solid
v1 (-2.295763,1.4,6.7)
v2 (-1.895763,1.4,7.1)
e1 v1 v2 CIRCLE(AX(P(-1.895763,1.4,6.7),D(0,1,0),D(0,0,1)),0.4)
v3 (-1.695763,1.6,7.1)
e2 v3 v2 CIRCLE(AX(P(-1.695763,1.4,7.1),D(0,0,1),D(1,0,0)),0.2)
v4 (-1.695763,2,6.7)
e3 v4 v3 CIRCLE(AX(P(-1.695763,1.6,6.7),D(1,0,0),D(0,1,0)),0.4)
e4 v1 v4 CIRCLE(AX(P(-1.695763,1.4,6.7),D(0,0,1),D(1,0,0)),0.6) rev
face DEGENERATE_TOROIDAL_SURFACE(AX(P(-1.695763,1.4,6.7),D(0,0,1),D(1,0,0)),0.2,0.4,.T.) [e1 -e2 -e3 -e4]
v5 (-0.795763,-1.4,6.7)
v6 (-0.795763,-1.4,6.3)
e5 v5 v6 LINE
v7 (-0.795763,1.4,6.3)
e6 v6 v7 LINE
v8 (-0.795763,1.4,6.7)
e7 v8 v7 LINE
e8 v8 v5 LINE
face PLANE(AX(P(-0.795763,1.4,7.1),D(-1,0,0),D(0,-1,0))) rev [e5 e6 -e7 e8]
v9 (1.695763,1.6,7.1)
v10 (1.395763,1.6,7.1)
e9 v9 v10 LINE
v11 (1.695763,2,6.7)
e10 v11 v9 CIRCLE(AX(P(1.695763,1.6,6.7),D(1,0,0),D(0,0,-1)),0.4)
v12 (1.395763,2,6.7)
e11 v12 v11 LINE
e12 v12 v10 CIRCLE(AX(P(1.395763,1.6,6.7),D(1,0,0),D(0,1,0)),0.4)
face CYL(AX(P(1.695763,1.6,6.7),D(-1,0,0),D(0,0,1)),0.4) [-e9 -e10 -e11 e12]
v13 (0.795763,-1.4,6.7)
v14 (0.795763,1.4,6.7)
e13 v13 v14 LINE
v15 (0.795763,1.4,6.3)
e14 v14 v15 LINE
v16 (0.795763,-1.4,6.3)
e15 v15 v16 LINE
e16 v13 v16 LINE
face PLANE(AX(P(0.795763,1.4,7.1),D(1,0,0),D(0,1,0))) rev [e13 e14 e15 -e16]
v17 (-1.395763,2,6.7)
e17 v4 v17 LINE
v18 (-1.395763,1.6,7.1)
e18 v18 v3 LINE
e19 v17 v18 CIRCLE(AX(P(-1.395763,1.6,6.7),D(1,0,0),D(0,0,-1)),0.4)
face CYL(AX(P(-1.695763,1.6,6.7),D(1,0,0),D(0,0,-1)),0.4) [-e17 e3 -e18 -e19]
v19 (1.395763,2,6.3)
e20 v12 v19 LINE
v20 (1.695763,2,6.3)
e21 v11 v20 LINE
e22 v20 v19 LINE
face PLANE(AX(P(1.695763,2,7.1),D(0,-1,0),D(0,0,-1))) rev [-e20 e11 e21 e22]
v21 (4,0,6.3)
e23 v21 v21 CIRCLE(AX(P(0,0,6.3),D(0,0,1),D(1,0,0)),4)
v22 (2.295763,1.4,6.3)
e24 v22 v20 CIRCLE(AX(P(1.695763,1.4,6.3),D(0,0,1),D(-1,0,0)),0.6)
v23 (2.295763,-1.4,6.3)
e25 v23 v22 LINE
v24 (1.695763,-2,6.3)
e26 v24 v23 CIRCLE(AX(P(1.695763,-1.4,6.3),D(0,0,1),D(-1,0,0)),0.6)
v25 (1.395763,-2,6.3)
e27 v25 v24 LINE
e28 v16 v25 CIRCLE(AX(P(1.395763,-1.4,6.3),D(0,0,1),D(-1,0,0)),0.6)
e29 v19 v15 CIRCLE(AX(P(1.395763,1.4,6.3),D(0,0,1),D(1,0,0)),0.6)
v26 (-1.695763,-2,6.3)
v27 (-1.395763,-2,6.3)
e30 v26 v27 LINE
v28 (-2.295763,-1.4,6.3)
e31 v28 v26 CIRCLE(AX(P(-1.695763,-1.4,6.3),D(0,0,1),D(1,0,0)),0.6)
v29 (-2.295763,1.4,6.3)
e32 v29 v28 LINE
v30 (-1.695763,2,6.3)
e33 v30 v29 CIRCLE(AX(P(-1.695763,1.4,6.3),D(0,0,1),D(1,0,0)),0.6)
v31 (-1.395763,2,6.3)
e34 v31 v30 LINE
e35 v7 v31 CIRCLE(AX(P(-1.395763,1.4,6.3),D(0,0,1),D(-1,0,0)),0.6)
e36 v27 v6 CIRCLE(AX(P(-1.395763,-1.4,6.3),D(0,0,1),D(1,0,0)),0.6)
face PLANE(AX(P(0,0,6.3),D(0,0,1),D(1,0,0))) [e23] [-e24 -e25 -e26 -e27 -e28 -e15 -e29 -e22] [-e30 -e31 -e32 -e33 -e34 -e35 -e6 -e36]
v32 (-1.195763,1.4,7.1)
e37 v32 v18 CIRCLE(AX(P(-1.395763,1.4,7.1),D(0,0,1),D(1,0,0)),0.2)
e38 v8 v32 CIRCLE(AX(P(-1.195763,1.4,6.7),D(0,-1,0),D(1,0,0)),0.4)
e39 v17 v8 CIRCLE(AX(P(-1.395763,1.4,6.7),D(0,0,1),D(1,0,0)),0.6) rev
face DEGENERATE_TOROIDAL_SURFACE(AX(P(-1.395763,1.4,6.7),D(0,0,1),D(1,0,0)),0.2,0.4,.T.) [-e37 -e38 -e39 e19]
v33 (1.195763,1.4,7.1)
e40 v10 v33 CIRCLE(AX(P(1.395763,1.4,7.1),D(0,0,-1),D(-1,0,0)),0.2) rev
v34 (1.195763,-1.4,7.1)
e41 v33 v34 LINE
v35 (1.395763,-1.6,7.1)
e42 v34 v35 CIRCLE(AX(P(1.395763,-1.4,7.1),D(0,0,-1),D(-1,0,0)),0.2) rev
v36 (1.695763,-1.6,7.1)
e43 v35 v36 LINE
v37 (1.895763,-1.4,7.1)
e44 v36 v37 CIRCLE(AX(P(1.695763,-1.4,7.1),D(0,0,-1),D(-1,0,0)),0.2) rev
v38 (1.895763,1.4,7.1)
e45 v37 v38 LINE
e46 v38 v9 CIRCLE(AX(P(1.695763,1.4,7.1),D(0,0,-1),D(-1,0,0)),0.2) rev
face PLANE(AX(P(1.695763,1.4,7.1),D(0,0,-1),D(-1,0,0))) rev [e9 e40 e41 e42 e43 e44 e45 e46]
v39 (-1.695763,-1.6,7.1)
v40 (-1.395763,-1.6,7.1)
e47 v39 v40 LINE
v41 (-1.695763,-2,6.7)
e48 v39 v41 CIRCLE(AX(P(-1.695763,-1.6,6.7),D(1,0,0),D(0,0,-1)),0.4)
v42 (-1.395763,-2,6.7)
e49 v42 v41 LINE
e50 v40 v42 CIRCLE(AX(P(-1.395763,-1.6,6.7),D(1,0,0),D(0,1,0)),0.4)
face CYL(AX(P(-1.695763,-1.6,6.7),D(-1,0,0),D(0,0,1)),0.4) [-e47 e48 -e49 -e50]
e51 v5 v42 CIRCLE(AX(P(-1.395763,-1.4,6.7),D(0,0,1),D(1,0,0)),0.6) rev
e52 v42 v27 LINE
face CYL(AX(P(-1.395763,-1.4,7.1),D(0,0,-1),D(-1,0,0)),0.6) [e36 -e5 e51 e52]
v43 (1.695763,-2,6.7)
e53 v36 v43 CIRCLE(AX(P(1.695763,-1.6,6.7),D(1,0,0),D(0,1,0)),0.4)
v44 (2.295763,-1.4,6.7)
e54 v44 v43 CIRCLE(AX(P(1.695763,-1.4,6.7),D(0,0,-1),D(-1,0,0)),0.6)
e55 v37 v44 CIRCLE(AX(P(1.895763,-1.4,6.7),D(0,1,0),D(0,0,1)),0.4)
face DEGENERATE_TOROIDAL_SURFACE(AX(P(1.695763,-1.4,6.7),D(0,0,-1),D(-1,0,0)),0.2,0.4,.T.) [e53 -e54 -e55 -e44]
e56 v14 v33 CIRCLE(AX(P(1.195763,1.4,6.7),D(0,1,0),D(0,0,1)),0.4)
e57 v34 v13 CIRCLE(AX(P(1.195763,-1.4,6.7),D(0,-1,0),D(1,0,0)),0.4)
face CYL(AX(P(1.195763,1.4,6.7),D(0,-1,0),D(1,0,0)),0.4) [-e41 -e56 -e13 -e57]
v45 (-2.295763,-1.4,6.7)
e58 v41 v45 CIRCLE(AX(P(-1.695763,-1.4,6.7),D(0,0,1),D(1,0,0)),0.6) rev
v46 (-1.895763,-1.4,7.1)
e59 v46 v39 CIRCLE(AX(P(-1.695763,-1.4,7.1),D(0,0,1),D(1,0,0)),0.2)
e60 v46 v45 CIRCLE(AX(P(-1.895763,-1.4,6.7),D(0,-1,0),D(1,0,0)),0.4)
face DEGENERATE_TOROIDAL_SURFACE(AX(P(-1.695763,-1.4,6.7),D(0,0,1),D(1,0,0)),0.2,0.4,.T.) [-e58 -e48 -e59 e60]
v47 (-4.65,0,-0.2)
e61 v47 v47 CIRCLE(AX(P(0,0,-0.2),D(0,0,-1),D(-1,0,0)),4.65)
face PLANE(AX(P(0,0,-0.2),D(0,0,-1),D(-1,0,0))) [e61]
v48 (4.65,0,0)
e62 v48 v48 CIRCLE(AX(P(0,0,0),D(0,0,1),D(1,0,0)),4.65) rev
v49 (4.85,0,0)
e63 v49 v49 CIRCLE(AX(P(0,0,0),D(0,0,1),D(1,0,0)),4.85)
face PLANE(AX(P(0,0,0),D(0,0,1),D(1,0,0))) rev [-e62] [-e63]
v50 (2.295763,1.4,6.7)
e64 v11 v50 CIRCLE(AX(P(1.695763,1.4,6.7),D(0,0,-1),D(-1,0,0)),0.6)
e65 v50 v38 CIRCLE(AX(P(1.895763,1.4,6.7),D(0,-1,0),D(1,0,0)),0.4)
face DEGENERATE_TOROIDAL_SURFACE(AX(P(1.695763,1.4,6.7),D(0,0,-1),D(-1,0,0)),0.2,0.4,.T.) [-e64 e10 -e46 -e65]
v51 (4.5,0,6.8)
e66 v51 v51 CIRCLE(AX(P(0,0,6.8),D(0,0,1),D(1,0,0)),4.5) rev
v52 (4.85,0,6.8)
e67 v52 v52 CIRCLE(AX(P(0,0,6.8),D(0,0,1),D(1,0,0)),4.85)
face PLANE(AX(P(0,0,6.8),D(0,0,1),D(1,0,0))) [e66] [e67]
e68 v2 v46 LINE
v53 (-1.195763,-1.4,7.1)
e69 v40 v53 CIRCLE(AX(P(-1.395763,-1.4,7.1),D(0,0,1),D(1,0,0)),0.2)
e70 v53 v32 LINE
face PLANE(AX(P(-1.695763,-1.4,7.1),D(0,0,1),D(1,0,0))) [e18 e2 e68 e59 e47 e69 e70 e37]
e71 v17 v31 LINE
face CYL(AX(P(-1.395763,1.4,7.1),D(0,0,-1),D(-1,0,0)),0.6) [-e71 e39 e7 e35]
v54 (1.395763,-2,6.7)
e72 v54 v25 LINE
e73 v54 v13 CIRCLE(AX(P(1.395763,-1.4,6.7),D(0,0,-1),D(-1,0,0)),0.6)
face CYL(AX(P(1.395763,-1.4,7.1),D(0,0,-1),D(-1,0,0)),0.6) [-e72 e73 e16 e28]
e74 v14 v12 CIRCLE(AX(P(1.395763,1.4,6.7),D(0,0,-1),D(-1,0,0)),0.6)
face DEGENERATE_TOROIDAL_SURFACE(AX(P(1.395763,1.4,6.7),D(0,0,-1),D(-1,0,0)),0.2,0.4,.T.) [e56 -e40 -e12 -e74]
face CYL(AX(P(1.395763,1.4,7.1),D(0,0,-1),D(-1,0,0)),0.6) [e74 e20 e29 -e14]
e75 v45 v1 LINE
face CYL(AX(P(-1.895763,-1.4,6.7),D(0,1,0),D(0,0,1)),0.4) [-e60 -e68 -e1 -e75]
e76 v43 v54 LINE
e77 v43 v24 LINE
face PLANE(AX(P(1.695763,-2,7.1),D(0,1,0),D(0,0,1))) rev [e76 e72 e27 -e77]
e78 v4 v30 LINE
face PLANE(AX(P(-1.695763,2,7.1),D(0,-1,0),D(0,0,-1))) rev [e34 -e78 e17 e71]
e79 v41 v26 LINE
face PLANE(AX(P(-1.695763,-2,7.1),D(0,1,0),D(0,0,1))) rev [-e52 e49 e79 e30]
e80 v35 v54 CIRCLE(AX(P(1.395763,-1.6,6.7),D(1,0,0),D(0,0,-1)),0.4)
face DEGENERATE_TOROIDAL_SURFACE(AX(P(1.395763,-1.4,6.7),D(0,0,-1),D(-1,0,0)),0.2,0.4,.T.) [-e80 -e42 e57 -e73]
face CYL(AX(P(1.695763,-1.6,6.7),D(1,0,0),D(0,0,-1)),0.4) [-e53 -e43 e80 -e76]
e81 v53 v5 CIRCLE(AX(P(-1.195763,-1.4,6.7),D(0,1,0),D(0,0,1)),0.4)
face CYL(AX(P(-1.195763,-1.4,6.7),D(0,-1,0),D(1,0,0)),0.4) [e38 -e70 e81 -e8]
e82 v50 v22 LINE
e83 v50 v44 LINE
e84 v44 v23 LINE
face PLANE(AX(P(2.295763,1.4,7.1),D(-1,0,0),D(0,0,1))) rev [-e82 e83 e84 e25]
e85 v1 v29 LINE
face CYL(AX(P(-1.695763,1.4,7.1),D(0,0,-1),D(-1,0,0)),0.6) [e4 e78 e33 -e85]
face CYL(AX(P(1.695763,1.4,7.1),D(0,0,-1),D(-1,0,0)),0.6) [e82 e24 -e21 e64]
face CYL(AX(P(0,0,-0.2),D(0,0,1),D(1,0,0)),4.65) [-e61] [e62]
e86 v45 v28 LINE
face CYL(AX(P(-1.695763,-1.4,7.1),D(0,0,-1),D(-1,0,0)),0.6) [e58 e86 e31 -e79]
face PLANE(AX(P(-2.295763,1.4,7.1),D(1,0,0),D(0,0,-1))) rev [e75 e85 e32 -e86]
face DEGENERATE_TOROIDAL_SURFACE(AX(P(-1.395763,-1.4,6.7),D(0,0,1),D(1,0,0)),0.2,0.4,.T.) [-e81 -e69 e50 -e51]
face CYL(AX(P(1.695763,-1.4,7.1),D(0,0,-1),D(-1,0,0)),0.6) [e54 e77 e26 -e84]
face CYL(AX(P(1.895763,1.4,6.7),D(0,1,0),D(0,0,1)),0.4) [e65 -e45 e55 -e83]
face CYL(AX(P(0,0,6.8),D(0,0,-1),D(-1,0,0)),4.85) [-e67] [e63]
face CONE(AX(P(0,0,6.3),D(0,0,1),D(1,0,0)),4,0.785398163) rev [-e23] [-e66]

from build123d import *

# Parameters (mm, degrees)
SKETCH_1_R          = 4.85
EXTRUDE_1_DEPTH     = 6.8
SKETCH_2_R          = 4
CUT_EXTRUDE_1_DEPTH = 0.5
CHAMFER_1_SIZE      = 0.5
EXTRUDE_2_DEPTH     = 0.8
FILLET_1_R          = 0.4
SKETCH_4_R          = 4.65
EXTRUDE_3_DEPTH     = 0.2


with BuildPart() as part:
    # Эскиз1 → Бобышка-Вытянуть1 (new body)
    with BuildSketch(Plane.XY):
        Circle(SKETCH_1_R)
    extrude(amount=EXTRUDE_1_DEPTH)

    # Эскиз2 → Вырез-Вытянуть1 (cut)
    with BuildSketch(Plane.XY.offset(6.8)):
        Circle(SKETCH_2_R)
    extrude(amount=-CUT_EXTRUDE_1_DEPTH, mode=Mode.SUBTRACT)

    # Фаска1
    chamfer_1_edges = [part.edges().sort_by_distance(p)[0] for p in [
        (-4, 0, 6.8),
    ]]
    chamfer(chamfer_1_edges, length=CHAMFER_1_SIZE - 0.0001)  # a hair under: the kernel refuses the full size

    # Эскиз3 → Бобышка-Вытянуть2 (add)
    with BuildSketch(Plane.XY.offset(6.3)):
        with BuildLine():
            Line((-1.695763296, 2), (-1.395763296, 2))
            ThreePointArc((-1.395763296, 2), (-0.971499227, 1.824264069), (-0.795763296, 1.4))
            Line((-0.795763296, 1.4), (-0.795763296, -1.4))
            ThreePointArc((-0.795763296, -1.4), (-0.971499227, -1.824264069), (-1.395763296, -2))
            Line((-1.395763296, -2), (-1.695763296, -2))
            ThreePointArc((-1.695763296, -2), (-2.120027365, -1.824264069), (-2.295763296, -1.4))
            Line((-2.295763296, -1.4), (-2.295763296, 1.4))
            ThreePointArc((-2.295763296, 1.4), (-2.120027365, 1.824264069), (-1.695763296, 2))
        make_face()
        with BuildLine():
            Line((0.795763296, 1.4), (0.795763296, -1.4))
            ThreePointArc((0.795763296, -1.4), (0.971499227, -1.824264069), (1.395763296, -2))
            Line((1.395763296, -2), (1.695763296, -2))
            ThreePointArc((1.695763296, -2), (2.120027365, -1.824264069), (2.295763296, -1.4))
            Line((2.295763296, -1.4), (2.295763296, 1.4))
            ThreePointArc((2.295763296, 1.4), (2.120027365, 1.824264069), (1.695763296, 2))
            Line((1.695763296, 2), (1.395763296, 2))
            ThreePointArc((1.395763296, 2), (0.971499227, 1.824264069), (0.795763296, 1.4))
        make_face()
    extrude(amount=EXTRUDE_2_DEPTH)

    # Скругление1
    fillet_1_edges = [part.edges().sort_by_distance(p)[0] for p in [
        (-2.120027365, -1.824264069, 7.1),
        (-1.545763296, -2, 7.1),
        (-0.971499227, -1.824264069, 7.1),
        (-0.795763296, 0, 7.1),
        (-0.971499227, 1.824264069, 7.1),
        (-1.545763296, 2, 7.1),
        (-2.120027365, 1.824264069, 7.1),
        (-2.295763296, 0, 7.1),
        (2.120027365, 1.824264069, 7.1),
        (1.545763296, 2, 7.1),
        (0.971499227, 1.824264069, 7.1),
        (0.795763296, 0, 7.1),
        (0.971499227, -1.824264069, 7.1),
        (1.545763296, -2, 7.1),
        (2.120027365, -1.824264069, 7.1),
        (2.295763296, 0, 7.1),
    ]]
    fillet(fillet_1_edges, radius=FILLET_1_R)

    # Эскиз4 → Бобышка-Вытянуть3 (add)
    with BuildSketch(Plane(origin=(0, 0, 0), x_dir=(-1, 0, 0), z_dir=(0, 0, -1))):
        with Locations(Location((0, 0, 0), (0, 0, 180))):
            Circle(SKETCH_4_R)
    extrude(amount=EXTRUDE_3_DEPTH)


solid = part.part
